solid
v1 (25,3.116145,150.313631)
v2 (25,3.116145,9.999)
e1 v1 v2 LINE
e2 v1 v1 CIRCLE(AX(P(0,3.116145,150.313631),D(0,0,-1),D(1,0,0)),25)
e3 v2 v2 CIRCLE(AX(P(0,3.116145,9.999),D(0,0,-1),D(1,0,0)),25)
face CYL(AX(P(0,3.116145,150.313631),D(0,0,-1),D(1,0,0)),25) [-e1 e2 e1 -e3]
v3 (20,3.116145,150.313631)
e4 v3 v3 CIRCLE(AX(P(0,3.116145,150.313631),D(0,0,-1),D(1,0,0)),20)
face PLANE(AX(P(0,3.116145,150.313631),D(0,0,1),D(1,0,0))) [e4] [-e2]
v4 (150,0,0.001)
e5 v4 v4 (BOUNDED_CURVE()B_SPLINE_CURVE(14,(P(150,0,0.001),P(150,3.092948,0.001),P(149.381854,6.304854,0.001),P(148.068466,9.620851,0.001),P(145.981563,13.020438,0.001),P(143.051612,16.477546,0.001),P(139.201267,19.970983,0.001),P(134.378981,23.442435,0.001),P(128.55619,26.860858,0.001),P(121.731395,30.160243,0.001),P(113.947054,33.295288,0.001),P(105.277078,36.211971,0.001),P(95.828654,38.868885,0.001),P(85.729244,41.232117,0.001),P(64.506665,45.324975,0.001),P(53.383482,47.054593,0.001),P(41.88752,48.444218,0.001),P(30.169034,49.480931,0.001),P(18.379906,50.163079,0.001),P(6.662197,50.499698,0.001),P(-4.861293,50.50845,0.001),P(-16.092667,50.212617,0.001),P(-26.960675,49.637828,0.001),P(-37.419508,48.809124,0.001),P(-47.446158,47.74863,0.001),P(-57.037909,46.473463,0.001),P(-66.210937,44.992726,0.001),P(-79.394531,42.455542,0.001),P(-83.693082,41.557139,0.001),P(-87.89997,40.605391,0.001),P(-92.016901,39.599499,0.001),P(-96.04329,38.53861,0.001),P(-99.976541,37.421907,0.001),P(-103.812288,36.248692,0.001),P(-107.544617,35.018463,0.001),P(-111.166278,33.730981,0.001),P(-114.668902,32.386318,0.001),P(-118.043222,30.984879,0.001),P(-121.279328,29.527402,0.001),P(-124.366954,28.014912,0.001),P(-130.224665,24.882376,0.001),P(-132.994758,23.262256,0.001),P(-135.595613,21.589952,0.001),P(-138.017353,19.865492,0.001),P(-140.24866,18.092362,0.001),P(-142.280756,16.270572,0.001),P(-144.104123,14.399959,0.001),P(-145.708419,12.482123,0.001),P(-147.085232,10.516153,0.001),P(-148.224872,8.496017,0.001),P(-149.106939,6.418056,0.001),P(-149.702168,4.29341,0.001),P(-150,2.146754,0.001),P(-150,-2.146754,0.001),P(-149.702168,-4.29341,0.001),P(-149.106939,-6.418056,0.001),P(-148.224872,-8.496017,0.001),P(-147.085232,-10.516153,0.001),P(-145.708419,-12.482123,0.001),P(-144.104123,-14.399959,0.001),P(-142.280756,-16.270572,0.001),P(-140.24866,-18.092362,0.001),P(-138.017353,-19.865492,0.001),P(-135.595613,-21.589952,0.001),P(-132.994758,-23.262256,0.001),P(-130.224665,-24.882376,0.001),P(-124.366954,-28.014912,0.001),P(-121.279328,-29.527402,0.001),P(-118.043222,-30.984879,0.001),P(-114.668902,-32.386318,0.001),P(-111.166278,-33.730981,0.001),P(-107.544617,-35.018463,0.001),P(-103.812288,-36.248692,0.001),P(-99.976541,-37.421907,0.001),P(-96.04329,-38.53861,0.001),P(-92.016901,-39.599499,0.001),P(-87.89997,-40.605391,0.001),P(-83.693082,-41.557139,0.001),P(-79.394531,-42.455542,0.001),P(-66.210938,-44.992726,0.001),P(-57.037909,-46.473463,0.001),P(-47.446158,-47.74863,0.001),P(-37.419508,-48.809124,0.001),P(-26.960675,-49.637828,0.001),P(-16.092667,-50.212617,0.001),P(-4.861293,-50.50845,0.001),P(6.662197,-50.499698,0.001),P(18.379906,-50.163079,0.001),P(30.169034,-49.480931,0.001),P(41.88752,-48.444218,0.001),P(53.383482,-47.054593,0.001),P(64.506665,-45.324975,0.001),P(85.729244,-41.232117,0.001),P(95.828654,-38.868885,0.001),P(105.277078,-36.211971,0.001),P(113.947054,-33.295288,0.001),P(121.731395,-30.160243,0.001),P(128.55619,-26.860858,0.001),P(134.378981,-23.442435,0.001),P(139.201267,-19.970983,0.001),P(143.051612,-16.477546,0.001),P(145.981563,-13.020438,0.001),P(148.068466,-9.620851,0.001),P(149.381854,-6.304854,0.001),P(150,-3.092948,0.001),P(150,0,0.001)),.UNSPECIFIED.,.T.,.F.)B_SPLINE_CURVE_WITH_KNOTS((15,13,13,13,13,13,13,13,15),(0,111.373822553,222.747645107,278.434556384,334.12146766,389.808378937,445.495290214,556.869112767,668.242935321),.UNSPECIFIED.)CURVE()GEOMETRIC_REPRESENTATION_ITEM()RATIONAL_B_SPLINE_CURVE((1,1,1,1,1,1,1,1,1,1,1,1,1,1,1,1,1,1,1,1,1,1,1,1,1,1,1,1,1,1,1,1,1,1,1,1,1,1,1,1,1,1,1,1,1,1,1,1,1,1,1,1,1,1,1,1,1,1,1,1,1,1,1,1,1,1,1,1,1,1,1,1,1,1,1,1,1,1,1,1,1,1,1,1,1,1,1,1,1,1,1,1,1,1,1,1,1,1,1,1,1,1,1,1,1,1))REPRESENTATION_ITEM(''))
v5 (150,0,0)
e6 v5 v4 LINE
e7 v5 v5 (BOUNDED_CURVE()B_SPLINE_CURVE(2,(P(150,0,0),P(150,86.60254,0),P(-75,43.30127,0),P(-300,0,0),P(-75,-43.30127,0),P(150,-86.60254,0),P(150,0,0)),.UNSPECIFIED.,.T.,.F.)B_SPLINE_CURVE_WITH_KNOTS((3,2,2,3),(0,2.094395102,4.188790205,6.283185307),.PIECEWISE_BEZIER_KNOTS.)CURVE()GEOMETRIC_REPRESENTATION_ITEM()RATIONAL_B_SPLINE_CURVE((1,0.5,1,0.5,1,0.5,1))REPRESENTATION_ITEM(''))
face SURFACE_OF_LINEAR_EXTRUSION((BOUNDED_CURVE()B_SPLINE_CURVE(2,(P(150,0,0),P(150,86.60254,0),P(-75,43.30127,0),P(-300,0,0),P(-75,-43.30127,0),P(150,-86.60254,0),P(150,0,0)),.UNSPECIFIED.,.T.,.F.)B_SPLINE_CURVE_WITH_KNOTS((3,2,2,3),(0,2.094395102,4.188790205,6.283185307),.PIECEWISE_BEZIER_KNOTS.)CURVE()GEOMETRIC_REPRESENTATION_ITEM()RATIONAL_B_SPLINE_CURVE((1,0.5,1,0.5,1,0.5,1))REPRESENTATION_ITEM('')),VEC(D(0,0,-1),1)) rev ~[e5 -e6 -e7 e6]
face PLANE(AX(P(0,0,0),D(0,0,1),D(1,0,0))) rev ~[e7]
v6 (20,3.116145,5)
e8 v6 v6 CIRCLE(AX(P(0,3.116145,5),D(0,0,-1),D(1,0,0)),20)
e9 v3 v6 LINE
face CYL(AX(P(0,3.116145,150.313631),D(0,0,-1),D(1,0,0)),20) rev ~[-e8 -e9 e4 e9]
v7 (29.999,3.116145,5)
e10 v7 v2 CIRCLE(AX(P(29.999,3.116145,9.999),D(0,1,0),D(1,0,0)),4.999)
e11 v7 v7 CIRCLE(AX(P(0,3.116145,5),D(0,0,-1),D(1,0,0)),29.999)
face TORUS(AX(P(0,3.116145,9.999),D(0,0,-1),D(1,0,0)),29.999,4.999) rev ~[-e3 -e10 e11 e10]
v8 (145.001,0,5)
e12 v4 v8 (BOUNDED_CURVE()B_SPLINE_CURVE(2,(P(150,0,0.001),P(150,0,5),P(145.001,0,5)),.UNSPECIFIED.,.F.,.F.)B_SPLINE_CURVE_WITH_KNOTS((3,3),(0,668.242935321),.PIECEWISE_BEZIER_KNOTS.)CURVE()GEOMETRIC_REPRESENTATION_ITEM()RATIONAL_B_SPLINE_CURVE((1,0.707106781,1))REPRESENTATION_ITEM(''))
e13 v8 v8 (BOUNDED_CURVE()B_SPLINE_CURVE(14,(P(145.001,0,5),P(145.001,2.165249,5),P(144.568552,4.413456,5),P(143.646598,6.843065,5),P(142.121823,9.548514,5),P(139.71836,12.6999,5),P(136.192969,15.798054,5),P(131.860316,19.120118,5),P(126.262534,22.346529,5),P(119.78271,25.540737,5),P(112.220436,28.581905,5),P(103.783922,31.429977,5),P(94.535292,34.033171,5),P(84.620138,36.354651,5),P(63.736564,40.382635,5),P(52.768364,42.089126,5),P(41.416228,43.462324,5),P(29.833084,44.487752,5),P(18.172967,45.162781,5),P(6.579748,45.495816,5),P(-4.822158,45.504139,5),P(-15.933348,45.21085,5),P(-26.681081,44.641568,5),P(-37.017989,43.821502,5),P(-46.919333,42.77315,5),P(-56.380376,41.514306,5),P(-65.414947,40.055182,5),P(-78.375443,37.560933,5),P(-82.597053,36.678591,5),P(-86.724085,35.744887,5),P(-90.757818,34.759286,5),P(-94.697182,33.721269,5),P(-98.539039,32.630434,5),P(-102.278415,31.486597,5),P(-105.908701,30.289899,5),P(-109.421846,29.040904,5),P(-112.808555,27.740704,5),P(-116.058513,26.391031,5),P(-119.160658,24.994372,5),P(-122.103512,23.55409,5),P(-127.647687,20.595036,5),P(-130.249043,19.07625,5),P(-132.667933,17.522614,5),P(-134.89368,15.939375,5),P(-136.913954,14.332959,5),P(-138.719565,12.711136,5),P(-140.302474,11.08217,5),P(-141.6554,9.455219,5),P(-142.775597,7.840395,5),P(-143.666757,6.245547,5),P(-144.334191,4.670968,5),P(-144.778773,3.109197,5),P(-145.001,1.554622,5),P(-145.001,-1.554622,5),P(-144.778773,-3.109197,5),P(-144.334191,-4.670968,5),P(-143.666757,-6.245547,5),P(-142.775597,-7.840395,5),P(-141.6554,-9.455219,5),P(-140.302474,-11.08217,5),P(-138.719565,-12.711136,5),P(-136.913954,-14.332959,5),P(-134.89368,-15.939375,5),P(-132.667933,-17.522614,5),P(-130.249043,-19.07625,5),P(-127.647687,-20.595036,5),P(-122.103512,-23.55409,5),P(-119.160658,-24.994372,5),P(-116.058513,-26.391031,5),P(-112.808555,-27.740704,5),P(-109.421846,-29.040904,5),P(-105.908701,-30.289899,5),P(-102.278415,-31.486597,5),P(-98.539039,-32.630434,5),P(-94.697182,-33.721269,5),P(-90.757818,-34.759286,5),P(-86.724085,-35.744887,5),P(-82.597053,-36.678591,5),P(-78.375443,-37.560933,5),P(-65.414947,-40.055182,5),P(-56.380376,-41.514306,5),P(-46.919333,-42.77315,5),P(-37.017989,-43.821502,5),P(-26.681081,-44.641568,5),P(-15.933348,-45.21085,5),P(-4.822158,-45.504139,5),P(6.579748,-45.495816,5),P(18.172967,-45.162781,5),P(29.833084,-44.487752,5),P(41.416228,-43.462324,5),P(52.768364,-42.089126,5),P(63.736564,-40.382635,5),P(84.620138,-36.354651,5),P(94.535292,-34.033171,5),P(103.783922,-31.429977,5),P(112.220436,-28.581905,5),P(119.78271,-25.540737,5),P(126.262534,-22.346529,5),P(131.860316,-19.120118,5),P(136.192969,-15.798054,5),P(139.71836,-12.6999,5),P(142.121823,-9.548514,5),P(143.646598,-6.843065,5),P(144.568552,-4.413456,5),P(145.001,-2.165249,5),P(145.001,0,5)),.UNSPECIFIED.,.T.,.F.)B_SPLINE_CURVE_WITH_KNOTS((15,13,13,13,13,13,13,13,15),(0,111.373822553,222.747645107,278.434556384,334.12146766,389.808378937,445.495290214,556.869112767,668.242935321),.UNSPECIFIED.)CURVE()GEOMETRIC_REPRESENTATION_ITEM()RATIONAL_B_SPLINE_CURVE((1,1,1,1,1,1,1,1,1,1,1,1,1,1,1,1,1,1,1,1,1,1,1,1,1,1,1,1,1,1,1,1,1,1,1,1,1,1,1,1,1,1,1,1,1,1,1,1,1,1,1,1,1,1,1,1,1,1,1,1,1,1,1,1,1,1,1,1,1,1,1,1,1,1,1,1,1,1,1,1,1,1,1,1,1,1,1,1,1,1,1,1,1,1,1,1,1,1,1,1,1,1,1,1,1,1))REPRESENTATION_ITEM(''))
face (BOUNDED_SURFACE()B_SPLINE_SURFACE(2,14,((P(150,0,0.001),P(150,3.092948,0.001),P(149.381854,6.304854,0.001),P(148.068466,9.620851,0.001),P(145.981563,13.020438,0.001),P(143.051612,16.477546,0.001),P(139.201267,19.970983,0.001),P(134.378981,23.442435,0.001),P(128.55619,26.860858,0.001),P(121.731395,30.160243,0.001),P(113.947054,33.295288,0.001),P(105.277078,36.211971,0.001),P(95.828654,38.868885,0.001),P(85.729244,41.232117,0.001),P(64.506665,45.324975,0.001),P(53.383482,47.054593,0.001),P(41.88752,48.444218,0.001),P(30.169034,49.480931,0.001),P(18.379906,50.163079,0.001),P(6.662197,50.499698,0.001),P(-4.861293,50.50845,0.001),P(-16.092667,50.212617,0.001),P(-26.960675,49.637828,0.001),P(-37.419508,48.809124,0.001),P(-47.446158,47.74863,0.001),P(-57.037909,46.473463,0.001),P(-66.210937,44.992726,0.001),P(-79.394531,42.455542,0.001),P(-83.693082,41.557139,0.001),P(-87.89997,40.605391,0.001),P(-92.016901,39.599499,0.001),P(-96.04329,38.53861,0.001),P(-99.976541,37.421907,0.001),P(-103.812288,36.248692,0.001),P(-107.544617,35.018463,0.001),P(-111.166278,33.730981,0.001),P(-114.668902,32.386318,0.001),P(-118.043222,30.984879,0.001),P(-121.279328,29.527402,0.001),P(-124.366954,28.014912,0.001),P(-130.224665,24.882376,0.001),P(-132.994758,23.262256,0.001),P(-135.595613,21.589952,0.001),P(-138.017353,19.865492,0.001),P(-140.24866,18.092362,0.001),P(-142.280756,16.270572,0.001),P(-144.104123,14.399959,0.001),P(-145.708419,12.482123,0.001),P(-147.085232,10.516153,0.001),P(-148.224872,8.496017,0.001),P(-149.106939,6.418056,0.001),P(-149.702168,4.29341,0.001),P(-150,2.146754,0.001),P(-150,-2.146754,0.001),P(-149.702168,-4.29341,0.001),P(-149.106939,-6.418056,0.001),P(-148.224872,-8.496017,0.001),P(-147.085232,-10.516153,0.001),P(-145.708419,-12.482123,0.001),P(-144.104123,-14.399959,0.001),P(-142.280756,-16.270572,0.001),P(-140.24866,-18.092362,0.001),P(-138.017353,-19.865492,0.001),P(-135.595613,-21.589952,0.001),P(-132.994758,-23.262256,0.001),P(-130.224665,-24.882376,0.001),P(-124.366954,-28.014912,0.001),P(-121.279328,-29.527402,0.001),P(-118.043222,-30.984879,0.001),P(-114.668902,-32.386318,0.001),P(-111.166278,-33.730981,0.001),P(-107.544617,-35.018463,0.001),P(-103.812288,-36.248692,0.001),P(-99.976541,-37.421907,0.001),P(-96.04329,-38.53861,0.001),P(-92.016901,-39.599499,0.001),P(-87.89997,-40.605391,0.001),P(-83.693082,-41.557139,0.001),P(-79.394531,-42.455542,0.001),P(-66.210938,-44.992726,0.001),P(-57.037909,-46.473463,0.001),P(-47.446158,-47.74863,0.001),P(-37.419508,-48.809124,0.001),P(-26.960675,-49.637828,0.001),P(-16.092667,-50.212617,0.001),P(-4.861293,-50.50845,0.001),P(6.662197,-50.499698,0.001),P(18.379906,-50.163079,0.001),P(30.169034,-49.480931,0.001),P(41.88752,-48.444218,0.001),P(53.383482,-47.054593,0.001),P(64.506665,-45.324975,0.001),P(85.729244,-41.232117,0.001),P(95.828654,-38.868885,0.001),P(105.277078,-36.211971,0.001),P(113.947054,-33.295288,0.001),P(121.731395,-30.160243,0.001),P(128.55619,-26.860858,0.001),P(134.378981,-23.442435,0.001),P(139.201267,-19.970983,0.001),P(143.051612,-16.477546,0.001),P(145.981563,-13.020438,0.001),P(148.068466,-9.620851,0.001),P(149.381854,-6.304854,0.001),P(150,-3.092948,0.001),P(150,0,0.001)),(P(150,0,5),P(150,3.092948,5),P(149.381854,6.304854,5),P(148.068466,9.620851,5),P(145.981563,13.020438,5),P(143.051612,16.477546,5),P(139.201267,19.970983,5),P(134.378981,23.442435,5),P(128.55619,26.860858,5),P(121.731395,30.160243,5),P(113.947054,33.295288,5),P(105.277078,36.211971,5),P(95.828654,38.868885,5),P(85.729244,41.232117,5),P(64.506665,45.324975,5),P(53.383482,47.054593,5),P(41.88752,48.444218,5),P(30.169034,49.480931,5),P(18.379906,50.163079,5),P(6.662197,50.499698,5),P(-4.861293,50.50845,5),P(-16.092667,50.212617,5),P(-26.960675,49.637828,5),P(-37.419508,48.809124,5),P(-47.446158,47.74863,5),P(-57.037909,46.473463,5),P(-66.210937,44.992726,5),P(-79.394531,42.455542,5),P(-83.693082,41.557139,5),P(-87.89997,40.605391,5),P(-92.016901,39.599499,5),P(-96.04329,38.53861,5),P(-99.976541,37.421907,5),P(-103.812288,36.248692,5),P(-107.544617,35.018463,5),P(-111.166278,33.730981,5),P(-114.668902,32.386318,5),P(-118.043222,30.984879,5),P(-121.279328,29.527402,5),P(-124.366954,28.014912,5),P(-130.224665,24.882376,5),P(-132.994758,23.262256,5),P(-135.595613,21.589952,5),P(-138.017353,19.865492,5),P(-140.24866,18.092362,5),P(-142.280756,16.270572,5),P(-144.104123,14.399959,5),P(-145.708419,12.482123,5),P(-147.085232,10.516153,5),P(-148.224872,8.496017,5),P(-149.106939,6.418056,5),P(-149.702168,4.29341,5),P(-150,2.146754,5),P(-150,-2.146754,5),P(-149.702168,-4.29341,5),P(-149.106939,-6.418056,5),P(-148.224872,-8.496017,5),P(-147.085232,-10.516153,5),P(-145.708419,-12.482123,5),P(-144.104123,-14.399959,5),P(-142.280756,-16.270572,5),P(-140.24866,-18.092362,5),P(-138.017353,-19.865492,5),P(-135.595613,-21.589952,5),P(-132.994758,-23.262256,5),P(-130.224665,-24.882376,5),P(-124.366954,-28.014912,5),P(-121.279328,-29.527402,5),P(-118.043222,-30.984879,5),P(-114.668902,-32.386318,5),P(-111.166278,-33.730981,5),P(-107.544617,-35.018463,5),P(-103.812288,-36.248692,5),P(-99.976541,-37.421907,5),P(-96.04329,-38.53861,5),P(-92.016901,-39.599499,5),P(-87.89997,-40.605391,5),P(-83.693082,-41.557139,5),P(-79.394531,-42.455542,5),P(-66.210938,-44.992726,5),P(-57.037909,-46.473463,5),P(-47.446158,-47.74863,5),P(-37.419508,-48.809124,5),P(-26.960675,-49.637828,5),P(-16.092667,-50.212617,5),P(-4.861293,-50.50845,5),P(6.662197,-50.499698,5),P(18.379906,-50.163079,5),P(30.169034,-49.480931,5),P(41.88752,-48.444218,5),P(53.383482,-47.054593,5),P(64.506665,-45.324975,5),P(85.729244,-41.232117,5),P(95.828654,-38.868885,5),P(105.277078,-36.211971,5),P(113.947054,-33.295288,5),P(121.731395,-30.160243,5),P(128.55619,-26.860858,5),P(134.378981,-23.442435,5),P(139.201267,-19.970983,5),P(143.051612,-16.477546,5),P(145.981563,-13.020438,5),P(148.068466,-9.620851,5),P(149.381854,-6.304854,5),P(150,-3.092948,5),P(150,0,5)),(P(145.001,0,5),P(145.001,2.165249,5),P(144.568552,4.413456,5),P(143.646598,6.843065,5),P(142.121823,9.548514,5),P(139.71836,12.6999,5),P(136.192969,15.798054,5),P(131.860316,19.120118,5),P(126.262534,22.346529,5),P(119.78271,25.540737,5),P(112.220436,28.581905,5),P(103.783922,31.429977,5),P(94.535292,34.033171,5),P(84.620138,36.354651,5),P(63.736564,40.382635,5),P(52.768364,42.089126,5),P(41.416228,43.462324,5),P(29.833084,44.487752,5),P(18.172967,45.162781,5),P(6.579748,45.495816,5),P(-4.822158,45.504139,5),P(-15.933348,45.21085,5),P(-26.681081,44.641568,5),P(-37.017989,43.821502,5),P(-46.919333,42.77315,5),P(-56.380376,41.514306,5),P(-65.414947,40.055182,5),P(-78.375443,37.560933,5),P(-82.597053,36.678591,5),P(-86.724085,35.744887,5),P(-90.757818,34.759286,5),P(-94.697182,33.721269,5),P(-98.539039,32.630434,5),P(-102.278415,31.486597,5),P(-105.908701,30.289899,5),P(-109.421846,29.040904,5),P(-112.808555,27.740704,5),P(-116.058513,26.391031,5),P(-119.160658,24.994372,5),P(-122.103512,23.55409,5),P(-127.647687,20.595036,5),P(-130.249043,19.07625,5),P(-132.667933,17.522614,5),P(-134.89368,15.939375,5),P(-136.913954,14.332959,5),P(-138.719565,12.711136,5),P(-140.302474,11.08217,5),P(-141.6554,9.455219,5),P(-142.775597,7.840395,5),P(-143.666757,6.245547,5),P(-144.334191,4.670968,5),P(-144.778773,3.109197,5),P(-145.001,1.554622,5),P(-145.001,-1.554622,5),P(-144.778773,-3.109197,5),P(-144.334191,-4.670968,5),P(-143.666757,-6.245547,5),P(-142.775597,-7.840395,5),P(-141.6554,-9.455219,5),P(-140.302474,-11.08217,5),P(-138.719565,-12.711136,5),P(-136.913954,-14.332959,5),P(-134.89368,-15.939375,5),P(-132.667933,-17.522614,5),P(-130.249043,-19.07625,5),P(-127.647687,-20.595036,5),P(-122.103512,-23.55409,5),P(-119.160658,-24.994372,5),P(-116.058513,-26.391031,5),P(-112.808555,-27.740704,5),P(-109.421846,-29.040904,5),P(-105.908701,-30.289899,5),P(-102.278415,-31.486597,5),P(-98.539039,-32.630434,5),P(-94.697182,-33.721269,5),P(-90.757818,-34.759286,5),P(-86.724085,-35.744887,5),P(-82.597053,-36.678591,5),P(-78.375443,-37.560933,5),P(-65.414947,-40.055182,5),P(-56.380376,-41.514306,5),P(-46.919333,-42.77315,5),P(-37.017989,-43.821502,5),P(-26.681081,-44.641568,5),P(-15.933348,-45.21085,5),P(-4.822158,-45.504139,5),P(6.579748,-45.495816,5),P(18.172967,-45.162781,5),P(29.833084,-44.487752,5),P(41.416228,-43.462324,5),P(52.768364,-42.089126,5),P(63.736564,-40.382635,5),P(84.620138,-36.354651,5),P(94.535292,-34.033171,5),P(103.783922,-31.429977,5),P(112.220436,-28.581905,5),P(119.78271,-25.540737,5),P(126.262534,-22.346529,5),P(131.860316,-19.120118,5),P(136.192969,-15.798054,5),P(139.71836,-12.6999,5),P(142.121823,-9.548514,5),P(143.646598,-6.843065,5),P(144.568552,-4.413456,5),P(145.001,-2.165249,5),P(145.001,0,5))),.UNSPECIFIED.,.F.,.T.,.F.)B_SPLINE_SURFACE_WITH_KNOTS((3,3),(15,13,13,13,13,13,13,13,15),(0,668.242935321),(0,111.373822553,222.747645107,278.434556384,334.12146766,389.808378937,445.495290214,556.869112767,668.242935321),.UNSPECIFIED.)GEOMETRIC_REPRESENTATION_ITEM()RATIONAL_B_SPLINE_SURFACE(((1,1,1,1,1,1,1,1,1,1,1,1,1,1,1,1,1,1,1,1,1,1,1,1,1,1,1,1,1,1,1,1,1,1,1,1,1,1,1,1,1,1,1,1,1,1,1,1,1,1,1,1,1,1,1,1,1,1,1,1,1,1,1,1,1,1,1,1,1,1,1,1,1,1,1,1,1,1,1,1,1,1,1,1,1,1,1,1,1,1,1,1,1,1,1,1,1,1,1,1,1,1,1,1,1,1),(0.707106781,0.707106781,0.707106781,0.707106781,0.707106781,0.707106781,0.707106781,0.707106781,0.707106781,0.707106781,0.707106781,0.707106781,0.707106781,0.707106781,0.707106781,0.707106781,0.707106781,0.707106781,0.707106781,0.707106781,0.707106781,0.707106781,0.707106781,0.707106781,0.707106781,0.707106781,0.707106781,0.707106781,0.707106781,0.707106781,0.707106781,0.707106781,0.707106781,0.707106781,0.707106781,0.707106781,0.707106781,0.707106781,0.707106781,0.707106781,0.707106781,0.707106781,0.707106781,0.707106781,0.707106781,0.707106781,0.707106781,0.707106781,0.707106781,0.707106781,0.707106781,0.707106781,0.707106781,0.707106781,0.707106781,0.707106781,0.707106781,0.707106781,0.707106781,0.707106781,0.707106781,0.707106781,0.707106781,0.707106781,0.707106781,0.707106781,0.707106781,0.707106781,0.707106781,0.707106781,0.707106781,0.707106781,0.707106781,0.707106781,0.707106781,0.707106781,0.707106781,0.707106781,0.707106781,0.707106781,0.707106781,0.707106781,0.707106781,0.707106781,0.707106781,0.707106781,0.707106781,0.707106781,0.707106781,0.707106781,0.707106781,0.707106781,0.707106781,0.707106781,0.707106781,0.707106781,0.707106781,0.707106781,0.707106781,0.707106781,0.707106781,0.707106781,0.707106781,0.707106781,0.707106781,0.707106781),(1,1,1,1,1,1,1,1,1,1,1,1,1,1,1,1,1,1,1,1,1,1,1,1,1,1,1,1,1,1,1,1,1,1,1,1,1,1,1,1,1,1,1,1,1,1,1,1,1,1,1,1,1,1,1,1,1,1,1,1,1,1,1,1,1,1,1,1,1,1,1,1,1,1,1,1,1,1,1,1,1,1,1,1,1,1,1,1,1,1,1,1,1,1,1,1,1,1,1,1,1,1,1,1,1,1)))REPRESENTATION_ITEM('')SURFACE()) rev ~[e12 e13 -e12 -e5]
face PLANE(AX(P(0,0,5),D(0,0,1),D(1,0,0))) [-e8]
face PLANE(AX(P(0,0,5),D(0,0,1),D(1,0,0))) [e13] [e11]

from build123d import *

# Parameters (mm, degrees)
F2_R     = 25
F2_R_2   = 19.999999553
F5_DEPTH = 5
F6_R     = 4.999


# Not quite as in the source:
# - a fillet or chamfer is up to 0.001 mm smaller than in the source, because OpenCascade refuses the exact size


with BuildPart() as f4:
    # F4: sweep along a path in F3
    with BuildLine(Plane.XZ) as f4_path:
        Line((0, 150.3136307001), (0, 0))
    # F2 (on offset) → F4 (sweep)
    with BuildSketch(Plane.XY.offset(150)):
        with Locations((0, 3.1161449583)):
            Circle(F2_R)
        with Locations((0, 3.1161449583)):
            Circle(F2_R_2, mode=Mode.SUBTRACT)
    sweep(path=f4_path.line)

    # F0 (on Top) → F5 (join)
    with BuildSketch(Plane.XY):
        with BuildLine():
            add(Edge.make_bspline(
                [(150, 0), (150, 86.6025403784), (-75, 43.3012701892), (-300, 0), (-75, -43.3012701892), (150, -86.6025403784), (150, 0)],
                knots=[0, 0, 0, 2.0943951024, 2.0943951024, 4.1887902048, 4.1887902048, 6.2831853072, 6.2831853072, 6.2831853072], degree=2, weights=[1, 0.5, 1, 0.5, 1, 0.5, 1]))
        make_face()
    extrude(amount=F5_DEPTH)

    # F6 (radius 5 in the source; OpenCascade refuses exactly that, so slightly less here)
    f6_edges = [f4.edges().sort_by_distance(p)[0] for p in [
        (-150, 0.000863, 5),
        (-25, 3.116145, 5),
    ]]
    fillet(f6_edges, radius=F6_R)


solid = f4.part
